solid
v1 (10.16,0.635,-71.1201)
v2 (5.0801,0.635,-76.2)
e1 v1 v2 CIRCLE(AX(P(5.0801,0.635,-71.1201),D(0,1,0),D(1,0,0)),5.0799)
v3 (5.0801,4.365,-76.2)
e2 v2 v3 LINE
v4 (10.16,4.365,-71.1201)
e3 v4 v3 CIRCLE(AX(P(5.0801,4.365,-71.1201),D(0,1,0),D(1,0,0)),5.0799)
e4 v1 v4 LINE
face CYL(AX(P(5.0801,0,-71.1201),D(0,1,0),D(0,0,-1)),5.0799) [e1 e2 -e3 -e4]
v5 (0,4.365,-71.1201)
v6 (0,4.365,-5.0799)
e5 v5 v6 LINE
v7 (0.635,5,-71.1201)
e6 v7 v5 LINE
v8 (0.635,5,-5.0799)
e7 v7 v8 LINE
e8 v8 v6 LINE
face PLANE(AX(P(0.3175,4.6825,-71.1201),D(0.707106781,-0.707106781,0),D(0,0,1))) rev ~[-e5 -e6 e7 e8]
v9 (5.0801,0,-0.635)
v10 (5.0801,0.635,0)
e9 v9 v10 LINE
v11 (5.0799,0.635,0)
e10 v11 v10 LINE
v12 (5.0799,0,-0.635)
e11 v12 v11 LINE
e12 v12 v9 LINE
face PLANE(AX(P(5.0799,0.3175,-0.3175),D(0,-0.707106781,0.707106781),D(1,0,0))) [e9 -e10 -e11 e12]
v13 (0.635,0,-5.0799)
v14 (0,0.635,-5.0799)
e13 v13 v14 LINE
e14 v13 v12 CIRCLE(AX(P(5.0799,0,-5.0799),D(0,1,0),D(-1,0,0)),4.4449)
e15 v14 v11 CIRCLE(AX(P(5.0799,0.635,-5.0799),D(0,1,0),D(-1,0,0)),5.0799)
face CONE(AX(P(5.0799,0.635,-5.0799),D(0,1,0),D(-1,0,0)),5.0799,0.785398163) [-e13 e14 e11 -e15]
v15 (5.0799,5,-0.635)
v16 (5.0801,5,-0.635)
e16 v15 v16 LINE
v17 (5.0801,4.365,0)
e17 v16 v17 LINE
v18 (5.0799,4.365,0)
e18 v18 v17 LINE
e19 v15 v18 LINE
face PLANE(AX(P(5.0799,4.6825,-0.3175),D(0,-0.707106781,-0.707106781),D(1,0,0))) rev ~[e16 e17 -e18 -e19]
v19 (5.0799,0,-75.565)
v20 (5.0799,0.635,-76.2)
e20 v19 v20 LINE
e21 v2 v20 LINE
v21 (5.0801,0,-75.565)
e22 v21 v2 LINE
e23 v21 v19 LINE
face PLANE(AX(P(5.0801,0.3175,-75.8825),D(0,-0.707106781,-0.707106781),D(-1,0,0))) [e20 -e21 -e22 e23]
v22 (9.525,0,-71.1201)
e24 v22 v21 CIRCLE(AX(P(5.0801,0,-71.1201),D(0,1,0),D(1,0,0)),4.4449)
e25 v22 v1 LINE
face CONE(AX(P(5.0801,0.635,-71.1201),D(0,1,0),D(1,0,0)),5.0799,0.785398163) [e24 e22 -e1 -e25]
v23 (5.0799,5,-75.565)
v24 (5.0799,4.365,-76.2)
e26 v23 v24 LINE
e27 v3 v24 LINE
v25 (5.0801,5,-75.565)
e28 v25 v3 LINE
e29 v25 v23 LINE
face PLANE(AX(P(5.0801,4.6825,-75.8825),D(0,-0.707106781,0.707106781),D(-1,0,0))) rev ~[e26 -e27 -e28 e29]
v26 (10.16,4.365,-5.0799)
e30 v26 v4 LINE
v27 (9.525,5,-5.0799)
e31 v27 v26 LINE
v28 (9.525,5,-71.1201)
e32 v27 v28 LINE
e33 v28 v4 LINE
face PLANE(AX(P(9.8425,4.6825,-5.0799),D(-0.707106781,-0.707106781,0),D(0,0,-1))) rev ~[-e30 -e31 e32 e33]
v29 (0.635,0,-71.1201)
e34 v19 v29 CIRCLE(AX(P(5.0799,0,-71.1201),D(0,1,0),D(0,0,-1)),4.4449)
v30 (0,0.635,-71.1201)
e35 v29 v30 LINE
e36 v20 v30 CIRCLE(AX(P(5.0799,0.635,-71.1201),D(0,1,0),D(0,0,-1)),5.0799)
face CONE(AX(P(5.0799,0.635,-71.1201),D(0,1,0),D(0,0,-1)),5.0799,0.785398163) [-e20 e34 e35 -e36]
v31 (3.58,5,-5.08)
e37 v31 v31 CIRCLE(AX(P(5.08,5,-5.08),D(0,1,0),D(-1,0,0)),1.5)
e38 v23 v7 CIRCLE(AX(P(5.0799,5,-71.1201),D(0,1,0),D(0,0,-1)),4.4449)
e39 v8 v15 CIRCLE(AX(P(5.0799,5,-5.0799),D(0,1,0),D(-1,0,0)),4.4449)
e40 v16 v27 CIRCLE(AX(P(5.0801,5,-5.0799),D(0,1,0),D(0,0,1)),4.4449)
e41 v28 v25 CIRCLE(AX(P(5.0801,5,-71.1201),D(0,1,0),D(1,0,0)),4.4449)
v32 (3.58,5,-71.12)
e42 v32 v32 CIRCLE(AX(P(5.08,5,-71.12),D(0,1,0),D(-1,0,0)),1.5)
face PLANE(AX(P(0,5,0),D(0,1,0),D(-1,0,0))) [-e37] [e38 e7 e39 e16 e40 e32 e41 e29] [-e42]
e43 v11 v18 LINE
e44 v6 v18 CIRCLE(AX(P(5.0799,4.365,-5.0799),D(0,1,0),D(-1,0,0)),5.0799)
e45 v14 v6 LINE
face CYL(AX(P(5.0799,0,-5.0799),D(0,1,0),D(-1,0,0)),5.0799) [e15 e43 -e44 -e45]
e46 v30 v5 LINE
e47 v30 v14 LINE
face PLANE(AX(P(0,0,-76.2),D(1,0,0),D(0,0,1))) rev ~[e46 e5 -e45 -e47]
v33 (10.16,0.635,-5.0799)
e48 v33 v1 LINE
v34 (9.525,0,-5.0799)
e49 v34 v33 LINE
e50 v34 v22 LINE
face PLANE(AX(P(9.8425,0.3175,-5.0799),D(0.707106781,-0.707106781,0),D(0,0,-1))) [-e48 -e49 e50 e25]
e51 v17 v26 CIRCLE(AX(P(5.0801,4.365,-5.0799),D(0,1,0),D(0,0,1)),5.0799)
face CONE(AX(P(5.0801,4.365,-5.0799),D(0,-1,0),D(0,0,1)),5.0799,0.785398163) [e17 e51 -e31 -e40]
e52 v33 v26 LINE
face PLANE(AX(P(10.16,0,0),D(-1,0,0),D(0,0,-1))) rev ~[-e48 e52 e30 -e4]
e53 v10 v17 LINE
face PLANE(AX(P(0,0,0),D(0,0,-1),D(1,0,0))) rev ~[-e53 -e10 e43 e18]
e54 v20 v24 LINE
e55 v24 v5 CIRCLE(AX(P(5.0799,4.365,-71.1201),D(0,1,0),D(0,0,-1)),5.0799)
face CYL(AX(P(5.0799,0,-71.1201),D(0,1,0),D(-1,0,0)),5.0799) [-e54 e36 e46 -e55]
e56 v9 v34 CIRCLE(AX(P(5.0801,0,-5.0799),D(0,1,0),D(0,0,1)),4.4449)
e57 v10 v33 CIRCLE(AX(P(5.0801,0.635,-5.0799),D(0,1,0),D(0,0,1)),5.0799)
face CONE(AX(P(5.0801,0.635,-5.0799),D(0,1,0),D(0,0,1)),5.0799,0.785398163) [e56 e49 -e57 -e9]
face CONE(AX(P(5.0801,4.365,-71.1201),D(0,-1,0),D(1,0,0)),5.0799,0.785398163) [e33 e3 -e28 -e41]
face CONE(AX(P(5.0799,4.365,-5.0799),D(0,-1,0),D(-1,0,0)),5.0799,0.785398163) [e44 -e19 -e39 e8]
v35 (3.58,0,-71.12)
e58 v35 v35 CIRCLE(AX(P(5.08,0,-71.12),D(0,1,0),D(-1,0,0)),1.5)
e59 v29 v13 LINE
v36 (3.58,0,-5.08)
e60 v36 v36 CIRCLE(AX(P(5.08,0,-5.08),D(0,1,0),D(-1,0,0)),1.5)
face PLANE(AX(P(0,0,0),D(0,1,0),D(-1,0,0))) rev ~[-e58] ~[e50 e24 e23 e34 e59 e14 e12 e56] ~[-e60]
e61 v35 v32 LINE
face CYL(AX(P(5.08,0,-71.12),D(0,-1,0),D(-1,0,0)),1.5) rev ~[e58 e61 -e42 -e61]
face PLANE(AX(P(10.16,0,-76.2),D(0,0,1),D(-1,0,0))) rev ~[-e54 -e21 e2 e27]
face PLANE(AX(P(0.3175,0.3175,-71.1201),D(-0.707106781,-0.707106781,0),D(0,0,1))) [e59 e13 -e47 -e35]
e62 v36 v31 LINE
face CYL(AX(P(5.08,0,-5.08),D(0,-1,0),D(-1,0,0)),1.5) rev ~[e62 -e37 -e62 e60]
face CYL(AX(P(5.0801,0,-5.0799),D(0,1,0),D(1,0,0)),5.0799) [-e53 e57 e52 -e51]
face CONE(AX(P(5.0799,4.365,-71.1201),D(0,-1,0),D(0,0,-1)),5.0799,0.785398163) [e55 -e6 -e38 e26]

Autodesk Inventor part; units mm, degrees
ref_plane "YZ Plane" through (0, 0, 0) normal (1, 0, 0) x (0, 1, 0)
ref_plane "XZ Plane" through (0, 0, 0) normal (0, 1, 0) x (-1, 0, 0)
ref_plane "XY Plane" through (0, 0, 0) normal (0, 0, 1) x (1, 0, 0)
sketch "Sketch1" plane through (0, 0, 0) normal (0, 1, 0) x (-1, 0, 0)
  line L0 (0, 0) -> (-10.16, 0)
  line L1 (-10.16, 0) -> (-10.16, -76.2)
  line L2 (-10.16, -76.2) -> (0, -76.2)
  line L3 (0, -76.2) -> (0, 0)
  line L4 (-5.08, -76.2) -> (-5.08, 0) construction
  circle A0 centre (-5.08, -71.12) radius 1.5
  circle A1 centre (-5.08, -5.08) radius 1.5
  dimension "d0" = 10.16
  dimension "d1" = 76.2
  dimension "d2" = 3
  dimension "d3" = 3
  dimension "d4" = 5.08
  dimension "d5" = 5.08
extrude "Extrusion1" add sketch "Sketch1" along normal blind 5
fillet "Fillet1" radius 5.08 4 edges at (10.16, 2.5, 0) (0, 2.5, 0) (10.16, 2.5, -76.2) (0, 2.5, -76.2)
chamfer "Chamfer1" distance 0.635 angle 45 12 edges at (10.16, 5, -38.1) (8.6721, 5, -74.7121) (8.6721, 5, -1.4879) (0, 5, -38.1) (1.4879, 5, -1.4879) (1.4879, 5, -74.7121) (10.16, 0, -38.1) (8.6721, 0, -74.7121) (8.6721, 0, -1.4879) (1.4879, 0, -1.4879) (0, 0, -38.1) (1.4879, 0, -74.7121)
equation "\"d4\" = 0.5 * d0"
equation "\"d5\" = d4"
